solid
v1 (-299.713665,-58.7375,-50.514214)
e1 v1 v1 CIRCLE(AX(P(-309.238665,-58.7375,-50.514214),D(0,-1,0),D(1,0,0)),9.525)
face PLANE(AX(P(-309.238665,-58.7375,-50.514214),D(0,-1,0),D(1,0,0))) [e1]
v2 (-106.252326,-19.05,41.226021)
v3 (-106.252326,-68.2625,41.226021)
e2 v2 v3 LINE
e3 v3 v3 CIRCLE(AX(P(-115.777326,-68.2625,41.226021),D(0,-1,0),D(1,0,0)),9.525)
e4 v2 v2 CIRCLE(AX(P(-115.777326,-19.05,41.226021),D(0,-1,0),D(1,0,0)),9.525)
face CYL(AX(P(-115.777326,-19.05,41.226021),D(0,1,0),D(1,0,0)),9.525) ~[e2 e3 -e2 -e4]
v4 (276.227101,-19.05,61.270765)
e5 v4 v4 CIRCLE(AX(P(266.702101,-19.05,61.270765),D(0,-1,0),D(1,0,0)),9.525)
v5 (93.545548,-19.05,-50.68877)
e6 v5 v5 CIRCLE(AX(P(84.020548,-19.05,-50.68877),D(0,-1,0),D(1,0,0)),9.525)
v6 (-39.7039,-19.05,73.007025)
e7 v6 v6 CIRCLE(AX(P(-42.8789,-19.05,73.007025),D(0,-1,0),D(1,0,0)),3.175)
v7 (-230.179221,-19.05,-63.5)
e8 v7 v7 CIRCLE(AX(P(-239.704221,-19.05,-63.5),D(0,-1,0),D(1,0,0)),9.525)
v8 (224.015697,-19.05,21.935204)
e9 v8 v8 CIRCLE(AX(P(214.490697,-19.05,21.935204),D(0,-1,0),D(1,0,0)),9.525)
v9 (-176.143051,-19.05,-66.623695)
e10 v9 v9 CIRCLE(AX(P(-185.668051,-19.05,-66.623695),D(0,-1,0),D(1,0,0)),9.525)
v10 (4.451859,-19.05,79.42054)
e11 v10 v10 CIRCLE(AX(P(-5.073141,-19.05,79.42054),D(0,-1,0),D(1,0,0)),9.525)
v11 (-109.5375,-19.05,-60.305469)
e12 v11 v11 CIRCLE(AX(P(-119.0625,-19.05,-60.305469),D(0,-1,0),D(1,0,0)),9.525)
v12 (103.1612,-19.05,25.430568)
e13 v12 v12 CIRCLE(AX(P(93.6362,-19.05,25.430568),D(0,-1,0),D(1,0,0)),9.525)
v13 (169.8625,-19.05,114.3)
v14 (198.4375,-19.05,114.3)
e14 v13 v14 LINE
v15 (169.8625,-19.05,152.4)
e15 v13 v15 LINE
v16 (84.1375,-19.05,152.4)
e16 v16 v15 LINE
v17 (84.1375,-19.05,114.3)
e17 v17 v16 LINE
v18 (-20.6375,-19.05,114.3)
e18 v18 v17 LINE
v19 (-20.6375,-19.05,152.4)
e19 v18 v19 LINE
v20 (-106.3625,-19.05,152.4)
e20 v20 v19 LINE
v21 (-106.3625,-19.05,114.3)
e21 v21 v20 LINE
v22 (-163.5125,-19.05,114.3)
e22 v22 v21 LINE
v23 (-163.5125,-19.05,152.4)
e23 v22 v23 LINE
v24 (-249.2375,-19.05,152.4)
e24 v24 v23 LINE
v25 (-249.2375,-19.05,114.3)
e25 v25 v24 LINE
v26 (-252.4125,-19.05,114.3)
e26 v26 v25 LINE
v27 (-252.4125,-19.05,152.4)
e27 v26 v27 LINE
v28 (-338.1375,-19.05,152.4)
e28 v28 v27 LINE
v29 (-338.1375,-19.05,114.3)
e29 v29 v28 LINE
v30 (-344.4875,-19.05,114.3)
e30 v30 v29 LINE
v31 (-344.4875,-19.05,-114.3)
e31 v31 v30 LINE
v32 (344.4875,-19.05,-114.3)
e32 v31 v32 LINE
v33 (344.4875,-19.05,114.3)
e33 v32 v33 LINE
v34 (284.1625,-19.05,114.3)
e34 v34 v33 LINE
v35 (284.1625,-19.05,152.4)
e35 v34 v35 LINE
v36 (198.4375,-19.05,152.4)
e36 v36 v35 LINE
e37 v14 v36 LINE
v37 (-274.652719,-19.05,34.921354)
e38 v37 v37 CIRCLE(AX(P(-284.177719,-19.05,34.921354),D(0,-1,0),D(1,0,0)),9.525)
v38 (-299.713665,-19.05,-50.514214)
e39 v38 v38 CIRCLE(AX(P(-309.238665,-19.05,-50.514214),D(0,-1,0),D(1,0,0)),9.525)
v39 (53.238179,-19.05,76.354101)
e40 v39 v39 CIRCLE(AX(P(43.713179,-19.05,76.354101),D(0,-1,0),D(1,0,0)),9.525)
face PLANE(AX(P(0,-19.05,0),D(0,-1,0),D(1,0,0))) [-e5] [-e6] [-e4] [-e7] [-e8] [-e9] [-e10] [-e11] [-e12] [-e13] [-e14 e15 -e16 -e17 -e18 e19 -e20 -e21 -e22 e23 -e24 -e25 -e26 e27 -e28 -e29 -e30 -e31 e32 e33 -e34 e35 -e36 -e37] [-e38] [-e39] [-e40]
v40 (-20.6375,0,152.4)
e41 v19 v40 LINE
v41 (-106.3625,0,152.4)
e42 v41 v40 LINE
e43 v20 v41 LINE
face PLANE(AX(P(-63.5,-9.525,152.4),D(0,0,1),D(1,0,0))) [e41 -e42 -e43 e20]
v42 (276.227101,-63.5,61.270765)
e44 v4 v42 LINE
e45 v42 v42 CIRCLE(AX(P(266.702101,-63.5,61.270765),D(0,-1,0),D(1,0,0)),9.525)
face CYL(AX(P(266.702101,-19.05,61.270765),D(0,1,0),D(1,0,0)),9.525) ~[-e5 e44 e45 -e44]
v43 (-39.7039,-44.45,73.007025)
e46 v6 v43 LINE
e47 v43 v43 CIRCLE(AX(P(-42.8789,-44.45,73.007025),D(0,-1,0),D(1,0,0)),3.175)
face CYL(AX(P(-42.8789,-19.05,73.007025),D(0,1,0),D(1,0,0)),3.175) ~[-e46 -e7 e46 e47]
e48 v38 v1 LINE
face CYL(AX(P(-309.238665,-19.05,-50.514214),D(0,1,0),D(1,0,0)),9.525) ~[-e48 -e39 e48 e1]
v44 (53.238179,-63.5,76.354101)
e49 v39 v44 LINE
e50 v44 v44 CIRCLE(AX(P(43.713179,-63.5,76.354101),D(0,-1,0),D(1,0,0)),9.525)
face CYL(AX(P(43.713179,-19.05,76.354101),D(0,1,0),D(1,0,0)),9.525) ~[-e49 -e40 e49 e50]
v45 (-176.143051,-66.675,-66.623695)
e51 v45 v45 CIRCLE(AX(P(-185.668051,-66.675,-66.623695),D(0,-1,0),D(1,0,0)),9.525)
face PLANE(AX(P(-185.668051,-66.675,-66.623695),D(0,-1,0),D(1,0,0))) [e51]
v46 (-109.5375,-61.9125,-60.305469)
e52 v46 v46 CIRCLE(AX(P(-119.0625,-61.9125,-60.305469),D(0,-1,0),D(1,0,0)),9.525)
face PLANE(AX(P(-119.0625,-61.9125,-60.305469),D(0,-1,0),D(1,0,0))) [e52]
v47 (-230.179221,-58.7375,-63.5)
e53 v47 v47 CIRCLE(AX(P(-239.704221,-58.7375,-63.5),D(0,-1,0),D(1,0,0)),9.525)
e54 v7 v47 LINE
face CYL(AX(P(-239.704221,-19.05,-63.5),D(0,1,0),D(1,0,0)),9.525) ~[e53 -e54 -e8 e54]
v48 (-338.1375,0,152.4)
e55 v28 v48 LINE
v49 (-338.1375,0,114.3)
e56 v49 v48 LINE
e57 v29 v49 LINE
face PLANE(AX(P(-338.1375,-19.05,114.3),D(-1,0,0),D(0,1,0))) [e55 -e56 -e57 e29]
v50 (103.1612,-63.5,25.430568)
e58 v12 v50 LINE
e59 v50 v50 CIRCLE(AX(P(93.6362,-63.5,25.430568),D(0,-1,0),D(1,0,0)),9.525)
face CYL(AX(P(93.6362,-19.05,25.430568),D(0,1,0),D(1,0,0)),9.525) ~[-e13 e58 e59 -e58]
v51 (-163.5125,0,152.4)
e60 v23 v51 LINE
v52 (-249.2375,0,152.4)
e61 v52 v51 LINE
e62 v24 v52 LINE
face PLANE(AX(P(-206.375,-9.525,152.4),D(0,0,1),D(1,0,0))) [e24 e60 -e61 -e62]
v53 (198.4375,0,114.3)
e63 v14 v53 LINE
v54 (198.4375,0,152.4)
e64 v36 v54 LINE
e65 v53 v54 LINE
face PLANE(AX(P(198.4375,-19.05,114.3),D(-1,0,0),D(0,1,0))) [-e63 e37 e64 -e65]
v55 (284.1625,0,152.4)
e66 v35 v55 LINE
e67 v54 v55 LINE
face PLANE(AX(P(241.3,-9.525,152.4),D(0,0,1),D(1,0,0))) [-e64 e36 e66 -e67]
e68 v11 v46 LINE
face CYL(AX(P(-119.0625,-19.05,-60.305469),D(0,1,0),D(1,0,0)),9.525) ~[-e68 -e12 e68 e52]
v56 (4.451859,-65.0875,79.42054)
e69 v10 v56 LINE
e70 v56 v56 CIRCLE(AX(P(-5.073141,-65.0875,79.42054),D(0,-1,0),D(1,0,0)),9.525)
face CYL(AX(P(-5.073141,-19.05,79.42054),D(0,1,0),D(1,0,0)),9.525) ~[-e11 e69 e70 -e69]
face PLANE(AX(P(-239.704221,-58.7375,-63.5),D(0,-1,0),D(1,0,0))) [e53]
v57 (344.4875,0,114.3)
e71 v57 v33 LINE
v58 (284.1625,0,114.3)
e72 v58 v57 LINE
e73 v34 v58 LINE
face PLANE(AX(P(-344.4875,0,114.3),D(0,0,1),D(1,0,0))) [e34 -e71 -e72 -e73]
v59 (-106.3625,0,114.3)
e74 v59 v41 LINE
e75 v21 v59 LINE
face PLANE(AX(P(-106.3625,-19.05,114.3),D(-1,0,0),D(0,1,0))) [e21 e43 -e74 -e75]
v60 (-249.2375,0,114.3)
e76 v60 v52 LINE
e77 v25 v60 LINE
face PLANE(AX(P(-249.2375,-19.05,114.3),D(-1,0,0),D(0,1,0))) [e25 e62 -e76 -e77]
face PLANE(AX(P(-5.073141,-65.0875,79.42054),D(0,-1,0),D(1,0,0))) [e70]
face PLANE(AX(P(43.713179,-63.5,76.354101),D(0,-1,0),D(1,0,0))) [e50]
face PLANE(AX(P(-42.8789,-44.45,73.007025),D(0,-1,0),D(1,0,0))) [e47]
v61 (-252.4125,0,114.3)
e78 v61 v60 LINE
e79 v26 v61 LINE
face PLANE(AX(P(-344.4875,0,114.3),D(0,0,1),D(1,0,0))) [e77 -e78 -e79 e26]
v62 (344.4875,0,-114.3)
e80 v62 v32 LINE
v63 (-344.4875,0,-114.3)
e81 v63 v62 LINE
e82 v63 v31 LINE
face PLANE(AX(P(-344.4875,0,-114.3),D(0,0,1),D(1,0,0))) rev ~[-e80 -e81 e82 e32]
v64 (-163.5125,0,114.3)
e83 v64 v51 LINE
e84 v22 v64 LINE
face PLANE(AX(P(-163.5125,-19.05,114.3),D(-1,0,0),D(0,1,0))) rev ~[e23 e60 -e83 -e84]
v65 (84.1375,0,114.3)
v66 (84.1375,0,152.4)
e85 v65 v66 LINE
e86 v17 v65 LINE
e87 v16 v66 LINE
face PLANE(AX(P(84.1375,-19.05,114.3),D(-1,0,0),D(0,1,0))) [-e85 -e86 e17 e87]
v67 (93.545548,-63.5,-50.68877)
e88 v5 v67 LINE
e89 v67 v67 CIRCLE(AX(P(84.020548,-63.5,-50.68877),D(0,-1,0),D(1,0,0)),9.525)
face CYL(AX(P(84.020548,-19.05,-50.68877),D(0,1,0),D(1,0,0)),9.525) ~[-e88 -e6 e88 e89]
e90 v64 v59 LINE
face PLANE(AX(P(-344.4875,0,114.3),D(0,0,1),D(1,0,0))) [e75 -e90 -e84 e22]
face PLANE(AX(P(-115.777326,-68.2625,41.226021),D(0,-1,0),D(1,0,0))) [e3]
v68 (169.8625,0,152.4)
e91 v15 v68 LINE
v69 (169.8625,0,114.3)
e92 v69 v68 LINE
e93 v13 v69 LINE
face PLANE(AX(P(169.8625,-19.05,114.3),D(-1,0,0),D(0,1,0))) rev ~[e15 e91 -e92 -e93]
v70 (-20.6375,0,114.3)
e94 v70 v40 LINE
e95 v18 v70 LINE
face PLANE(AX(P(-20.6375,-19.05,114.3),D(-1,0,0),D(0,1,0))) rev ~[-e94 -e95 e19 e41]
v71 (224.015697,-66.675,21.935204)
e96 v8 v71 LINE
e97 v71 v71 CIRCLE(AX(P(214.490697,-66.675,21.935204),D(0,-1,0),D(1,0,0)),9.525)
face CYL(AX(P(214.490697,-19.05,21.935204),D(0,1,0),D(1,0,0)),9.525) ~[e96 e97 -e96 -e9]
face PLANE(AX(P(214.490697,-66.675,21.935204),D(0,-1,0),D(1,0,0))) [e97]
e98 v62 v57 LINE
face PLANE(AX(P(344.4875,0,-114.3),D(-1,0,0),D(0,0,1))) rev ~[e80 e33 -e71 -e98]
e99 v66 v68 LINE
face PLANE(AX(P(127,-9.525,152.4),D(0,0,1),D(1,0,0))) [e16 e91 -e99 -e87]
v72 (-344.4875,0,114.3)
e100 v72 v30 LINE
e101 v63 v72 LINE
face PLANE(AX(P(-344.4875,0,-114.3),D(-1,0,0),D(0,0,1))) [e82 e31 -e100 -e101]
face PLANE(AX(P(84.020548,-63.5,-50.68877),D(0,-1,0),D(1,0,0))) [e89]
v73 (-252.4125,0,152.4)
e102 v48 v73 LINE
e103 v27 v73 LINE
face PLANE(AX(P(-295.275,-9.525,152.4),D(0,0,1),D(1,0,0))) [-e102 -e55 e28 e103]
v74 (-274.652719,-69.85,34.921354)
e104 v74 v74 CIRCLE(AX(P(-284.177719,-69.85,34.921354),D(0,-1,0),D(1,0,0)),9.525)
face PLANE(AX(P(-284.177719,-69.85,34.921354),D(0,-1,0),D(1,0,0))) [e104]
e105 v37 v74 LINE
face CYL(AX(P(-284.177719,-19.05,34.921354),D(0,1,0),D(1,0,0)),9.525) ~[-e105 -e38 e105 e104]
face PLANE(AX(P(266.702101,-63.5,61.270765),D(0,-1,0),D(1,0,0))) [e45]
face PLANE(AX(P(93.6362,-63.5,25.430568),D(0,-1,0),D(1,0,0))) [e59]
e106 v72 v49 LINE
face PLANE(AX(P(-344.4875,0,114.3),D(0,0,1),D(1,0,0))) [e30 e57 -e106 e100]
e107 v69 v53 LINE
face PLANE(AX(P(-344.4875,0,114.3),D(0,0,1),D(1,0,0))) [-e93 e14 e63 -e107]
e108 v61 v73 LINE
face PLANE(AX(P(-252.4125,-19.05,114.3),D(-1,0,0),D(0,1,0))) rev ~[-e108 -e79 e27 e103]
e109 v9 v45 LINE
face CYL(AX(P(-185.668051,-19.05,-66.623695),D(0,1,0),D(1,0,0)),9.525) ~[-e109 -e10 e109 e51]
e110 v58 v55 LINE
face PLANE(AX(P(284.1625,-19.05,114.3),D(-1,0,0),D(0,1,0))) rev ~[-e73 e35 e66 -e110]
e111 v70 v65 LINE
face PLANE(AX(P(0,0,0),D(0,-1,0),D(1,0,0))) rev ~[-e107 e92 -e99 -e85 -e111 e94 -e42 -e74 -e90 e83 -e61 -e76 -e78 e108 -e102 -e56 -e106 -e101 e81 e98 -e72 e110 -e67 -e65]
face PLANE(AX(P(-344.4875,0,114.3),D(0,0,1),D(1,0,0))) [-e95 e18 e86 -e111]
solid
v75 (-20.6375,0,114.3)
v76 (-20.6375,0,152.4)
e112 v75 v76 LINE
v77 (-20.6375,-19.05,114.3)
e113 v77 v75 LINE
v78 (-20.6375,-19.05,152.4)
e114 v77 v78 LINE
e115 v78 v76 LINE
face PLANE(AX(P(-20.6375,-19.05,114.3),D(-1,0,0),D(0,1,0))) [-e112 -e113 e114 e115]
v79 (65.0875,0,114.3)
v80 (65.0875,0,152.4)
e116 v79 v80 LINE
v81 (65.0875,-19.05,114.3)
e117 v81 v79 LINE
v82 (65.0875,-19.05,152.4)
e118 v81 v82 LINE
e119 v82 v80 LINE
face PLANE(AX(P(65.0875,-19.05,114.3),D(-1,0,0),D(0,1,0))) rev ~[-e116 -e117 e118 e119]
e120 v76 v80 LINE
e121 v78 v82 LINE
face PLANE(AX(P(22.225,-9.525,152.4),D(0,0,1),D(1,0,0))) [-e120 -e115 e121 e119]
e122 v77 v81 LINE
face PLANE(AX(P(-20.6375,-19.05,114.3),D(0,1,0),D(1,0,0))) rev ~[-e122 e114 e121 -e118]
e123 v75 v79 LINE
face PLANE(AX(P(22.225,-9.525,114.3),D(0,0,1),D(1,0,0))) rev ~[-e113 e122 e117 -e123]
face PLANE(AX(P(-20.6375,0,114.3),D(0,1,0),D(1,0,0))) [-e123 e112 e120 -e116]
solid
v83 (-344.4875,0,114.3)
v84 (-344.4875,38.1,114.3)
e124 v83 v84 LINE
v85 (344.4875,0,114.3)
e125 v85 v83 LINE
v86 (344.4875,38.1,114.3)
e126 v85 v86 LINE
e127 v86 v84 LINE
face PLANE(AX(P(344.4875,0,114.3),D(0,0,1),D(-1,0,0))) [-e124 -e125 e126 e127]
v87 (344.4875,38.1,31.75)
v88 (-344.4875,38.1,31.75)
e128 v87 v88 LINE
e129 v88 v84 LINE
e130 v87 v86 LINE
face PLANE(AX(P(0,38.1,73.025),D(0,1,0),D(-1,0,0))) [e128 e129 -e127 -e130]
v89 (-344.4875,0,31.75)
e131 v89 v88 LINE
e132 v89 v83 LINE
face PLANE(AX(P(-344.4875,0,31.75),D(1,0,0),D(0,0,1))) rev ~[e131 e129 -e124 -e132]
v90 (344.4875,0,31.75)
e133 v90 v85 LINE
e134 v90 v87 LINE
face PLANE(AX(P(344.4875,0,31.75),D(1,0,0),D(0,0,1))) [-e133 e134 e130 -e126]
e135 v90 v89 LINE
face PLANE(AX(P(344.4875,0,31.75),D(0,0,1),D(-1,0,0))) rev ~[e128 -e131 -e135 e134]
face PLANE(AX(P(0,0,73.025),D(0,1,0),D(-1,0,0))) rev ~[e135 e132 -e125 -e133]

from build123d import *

# Parameters (mm, degrees)
F0_W      = 688.975
F0_H      = 228.6
F1_DEPTH  = 19.05
F2_W      = 688.975
F2_H      = 82.55
F3_DEPTH  = 38.1
F4_R      = 9.525
F5_DEPTH  = 50.8
F6_DEPTH  = 49.2125
F7_DEPTH  = 46.0375
F8_DEPTH  = 44.45
F9_DEPTH  = 44.45
F10_DEPTH = 39.6875
F11_DEPTH = 39.6875
F12_DEPTH = 47.625
F13_DEPTH = 42.8625
F14_DEPTH = 44.45
F15_DEPTH = 47.625
F16_DEPTH = 44.45
F4_R_2    = 3.175
F17_DEPTH = 25.4
F18_W     = 85.725
F18_H     = 19.05
F19_DEPTH = 38.1
F20_DEPTH = 38.1
F21_DEPTH = 38.1
F22_DEPTH = 38.1


with BuildPart() as f1:
    # F0 (on Front) → F1 (new body)
    with BuildSketch(Plane.XZ):
        Rectangle(F0_W, F0_H)
    extrude(amount=F1_DEPTH)

    # F4 (on face) → F5 (join)
    with BuildSketch(Plane.XZ.offset(19.05)):
        with Locations((-284.177719027, 34.921354228)):
            Circle(F4_R)
    extrude(amount=F5_DEPTH)

    # F4 (on face) → F6 (join)
    with BuildSketch(Plane.XZ.offset(19.05)):
        with Locations((-115.7773256969, 41.2260214307)):
            Circle(F4_R)
    extrude(amount=F6_DEPTH)

    # F4 (on face) → F7 (join)
    with BuildSketch(Plane.XZ.offset(19.05)):
        with Locations((-5.0731406292, 79.4205398983)):
            Circle(F4_R)
    extrude(amount=F7_DEPTH)

    # F4 (on face) → F8 (join)
    with BuildSketch(Plane.XZ.offset(19.05)):
        with Locations((43.7131791432, 76.3541009185)):
            Circle(F4_R)
    extrude(amount=F8_DEPTH)

    # F4 (on face) → F9 (join)
    with BuildSketch(Plane.XZ.offset(19.05)):
        with Locations((266.7021014949, 61.2707650235)):
            Circle(F4_R)
    extrude(amount=F9_DEPTH)

    # F4 (on face) → F10 (join)
    with BuildSketch(Plane.XZ.offset(19.05)):
        with Locations((-309.2386653451, -50.5142142372)):
            Circle(F4_R)
    extrude(amount=F10_DEPTH)

    # F4 (on face) → F11 (join)
    with BuildSketch(Plane.XZ.offset(19.05)):
        with Locations((-239.704221487, -63.5)):
            Circle(F4_R)
    extrude(amount=F11_DEPTH)

    # F4 (on face) → F12 (join)
    with BuildSketch(Plane.XZ.offset(19.05)):
        with Locations((-185.6680512428, -66.6236951947)):
            Circle(F4_R)
    extrude(amount=F12_DEPTH)

    # F4 (on face) → F13 (join)
    with BuildSketch(Plane.XZ.offset(19.05)):
        with Locations((-119.0625, -60.3054687381)):
            Circle(F4_R)
    extrude(amount=F13_DEPTH)

    # F4 (on face) → F14 (join)
    with BuildSketch(Plane.XZ.offset(19.05)):
        with Locations((93.636199832, 25.4305675626)):
            Circle(F4_R)
    extrude(amount=F14_DEPTH)

    # F4 (on face) → F15 (join)
    with BuildSketch(Plane.XZ.offset(19.05)):
        with Locations((214.4906967878, 21.935204044)):
            Circle(F4_R)
    extrude(amount=F15_DEPTH)

    # F4 (on face) → F16 (join)
    with BuildSketch(Plane.XZ.offset(19.05)):
        with Locations((84.0205475688, -50.6887696683)):
            Circle(F4_R)
    extrude(amount=F16_DEPTH)

    # F4 (on face) → F17 (join)
    with BuildSketch(Plane.XZ.offset(19.05)):
        with Locations((-42.8788997233, 73.0070248246)):
            Circle(F4_R_2)
    extrude(amount=F17_DEPTH)

    # F18 (on face) → F19 (join)
    with BuildSketch(Plane.XY.offset(114.3)):
        with Locations((-295.275, -9.525)):
            Rectangle(F18_W, F18_H)
    extrude(amount=F19_DEPTH)

    # F18 (on face) → F20 (join)
    with BuildSketch(Plane.XY.offset(114.3)):
        with Locations((-206.375, -9.525)):
            Rectangle(F18_W, F18_H)
        with Locations((-63.5, -9.525)):
            Rectangle(F18_W, F18_H)
    extrude(amount=F20_DEPTH)

    # F18 (on face) → F22 (join)
    with BuildSketch(Plane.XY.offset(114.3)):
        with Locations((127, -9.525)):
            Rectangle(F18_W, F18_H)
        with Locations((241.3, -9.525)):
            Rectangle(F18_W, F18_H)
    extrude(amount=F22_DEPTH)


with BuildPart() as f3:
    # F2 (on face) → F3 (new body)
    with BuildSketch(Plane(origin=(0, 0, 0), x_dir=(-1, 0, 0), z_dir=(0, 1, 0))):
        with Locations((0, 73.025)):
            Rectangle(F2_W, F2_H)
    extrude(amount=F3_DEPTH)


with BuildPart() as f21:
    # F18 (on face) → F21 (new body)
    with BuildSketch(Plane.XY.offset(114.3)):
        with Locations((22.225, -9.525)):
            Rectangle(F18_W, F18_H)
    extrude(amount=F21_DEPTH)


solid = Compound([f1.part, f3.part, f21.part])
